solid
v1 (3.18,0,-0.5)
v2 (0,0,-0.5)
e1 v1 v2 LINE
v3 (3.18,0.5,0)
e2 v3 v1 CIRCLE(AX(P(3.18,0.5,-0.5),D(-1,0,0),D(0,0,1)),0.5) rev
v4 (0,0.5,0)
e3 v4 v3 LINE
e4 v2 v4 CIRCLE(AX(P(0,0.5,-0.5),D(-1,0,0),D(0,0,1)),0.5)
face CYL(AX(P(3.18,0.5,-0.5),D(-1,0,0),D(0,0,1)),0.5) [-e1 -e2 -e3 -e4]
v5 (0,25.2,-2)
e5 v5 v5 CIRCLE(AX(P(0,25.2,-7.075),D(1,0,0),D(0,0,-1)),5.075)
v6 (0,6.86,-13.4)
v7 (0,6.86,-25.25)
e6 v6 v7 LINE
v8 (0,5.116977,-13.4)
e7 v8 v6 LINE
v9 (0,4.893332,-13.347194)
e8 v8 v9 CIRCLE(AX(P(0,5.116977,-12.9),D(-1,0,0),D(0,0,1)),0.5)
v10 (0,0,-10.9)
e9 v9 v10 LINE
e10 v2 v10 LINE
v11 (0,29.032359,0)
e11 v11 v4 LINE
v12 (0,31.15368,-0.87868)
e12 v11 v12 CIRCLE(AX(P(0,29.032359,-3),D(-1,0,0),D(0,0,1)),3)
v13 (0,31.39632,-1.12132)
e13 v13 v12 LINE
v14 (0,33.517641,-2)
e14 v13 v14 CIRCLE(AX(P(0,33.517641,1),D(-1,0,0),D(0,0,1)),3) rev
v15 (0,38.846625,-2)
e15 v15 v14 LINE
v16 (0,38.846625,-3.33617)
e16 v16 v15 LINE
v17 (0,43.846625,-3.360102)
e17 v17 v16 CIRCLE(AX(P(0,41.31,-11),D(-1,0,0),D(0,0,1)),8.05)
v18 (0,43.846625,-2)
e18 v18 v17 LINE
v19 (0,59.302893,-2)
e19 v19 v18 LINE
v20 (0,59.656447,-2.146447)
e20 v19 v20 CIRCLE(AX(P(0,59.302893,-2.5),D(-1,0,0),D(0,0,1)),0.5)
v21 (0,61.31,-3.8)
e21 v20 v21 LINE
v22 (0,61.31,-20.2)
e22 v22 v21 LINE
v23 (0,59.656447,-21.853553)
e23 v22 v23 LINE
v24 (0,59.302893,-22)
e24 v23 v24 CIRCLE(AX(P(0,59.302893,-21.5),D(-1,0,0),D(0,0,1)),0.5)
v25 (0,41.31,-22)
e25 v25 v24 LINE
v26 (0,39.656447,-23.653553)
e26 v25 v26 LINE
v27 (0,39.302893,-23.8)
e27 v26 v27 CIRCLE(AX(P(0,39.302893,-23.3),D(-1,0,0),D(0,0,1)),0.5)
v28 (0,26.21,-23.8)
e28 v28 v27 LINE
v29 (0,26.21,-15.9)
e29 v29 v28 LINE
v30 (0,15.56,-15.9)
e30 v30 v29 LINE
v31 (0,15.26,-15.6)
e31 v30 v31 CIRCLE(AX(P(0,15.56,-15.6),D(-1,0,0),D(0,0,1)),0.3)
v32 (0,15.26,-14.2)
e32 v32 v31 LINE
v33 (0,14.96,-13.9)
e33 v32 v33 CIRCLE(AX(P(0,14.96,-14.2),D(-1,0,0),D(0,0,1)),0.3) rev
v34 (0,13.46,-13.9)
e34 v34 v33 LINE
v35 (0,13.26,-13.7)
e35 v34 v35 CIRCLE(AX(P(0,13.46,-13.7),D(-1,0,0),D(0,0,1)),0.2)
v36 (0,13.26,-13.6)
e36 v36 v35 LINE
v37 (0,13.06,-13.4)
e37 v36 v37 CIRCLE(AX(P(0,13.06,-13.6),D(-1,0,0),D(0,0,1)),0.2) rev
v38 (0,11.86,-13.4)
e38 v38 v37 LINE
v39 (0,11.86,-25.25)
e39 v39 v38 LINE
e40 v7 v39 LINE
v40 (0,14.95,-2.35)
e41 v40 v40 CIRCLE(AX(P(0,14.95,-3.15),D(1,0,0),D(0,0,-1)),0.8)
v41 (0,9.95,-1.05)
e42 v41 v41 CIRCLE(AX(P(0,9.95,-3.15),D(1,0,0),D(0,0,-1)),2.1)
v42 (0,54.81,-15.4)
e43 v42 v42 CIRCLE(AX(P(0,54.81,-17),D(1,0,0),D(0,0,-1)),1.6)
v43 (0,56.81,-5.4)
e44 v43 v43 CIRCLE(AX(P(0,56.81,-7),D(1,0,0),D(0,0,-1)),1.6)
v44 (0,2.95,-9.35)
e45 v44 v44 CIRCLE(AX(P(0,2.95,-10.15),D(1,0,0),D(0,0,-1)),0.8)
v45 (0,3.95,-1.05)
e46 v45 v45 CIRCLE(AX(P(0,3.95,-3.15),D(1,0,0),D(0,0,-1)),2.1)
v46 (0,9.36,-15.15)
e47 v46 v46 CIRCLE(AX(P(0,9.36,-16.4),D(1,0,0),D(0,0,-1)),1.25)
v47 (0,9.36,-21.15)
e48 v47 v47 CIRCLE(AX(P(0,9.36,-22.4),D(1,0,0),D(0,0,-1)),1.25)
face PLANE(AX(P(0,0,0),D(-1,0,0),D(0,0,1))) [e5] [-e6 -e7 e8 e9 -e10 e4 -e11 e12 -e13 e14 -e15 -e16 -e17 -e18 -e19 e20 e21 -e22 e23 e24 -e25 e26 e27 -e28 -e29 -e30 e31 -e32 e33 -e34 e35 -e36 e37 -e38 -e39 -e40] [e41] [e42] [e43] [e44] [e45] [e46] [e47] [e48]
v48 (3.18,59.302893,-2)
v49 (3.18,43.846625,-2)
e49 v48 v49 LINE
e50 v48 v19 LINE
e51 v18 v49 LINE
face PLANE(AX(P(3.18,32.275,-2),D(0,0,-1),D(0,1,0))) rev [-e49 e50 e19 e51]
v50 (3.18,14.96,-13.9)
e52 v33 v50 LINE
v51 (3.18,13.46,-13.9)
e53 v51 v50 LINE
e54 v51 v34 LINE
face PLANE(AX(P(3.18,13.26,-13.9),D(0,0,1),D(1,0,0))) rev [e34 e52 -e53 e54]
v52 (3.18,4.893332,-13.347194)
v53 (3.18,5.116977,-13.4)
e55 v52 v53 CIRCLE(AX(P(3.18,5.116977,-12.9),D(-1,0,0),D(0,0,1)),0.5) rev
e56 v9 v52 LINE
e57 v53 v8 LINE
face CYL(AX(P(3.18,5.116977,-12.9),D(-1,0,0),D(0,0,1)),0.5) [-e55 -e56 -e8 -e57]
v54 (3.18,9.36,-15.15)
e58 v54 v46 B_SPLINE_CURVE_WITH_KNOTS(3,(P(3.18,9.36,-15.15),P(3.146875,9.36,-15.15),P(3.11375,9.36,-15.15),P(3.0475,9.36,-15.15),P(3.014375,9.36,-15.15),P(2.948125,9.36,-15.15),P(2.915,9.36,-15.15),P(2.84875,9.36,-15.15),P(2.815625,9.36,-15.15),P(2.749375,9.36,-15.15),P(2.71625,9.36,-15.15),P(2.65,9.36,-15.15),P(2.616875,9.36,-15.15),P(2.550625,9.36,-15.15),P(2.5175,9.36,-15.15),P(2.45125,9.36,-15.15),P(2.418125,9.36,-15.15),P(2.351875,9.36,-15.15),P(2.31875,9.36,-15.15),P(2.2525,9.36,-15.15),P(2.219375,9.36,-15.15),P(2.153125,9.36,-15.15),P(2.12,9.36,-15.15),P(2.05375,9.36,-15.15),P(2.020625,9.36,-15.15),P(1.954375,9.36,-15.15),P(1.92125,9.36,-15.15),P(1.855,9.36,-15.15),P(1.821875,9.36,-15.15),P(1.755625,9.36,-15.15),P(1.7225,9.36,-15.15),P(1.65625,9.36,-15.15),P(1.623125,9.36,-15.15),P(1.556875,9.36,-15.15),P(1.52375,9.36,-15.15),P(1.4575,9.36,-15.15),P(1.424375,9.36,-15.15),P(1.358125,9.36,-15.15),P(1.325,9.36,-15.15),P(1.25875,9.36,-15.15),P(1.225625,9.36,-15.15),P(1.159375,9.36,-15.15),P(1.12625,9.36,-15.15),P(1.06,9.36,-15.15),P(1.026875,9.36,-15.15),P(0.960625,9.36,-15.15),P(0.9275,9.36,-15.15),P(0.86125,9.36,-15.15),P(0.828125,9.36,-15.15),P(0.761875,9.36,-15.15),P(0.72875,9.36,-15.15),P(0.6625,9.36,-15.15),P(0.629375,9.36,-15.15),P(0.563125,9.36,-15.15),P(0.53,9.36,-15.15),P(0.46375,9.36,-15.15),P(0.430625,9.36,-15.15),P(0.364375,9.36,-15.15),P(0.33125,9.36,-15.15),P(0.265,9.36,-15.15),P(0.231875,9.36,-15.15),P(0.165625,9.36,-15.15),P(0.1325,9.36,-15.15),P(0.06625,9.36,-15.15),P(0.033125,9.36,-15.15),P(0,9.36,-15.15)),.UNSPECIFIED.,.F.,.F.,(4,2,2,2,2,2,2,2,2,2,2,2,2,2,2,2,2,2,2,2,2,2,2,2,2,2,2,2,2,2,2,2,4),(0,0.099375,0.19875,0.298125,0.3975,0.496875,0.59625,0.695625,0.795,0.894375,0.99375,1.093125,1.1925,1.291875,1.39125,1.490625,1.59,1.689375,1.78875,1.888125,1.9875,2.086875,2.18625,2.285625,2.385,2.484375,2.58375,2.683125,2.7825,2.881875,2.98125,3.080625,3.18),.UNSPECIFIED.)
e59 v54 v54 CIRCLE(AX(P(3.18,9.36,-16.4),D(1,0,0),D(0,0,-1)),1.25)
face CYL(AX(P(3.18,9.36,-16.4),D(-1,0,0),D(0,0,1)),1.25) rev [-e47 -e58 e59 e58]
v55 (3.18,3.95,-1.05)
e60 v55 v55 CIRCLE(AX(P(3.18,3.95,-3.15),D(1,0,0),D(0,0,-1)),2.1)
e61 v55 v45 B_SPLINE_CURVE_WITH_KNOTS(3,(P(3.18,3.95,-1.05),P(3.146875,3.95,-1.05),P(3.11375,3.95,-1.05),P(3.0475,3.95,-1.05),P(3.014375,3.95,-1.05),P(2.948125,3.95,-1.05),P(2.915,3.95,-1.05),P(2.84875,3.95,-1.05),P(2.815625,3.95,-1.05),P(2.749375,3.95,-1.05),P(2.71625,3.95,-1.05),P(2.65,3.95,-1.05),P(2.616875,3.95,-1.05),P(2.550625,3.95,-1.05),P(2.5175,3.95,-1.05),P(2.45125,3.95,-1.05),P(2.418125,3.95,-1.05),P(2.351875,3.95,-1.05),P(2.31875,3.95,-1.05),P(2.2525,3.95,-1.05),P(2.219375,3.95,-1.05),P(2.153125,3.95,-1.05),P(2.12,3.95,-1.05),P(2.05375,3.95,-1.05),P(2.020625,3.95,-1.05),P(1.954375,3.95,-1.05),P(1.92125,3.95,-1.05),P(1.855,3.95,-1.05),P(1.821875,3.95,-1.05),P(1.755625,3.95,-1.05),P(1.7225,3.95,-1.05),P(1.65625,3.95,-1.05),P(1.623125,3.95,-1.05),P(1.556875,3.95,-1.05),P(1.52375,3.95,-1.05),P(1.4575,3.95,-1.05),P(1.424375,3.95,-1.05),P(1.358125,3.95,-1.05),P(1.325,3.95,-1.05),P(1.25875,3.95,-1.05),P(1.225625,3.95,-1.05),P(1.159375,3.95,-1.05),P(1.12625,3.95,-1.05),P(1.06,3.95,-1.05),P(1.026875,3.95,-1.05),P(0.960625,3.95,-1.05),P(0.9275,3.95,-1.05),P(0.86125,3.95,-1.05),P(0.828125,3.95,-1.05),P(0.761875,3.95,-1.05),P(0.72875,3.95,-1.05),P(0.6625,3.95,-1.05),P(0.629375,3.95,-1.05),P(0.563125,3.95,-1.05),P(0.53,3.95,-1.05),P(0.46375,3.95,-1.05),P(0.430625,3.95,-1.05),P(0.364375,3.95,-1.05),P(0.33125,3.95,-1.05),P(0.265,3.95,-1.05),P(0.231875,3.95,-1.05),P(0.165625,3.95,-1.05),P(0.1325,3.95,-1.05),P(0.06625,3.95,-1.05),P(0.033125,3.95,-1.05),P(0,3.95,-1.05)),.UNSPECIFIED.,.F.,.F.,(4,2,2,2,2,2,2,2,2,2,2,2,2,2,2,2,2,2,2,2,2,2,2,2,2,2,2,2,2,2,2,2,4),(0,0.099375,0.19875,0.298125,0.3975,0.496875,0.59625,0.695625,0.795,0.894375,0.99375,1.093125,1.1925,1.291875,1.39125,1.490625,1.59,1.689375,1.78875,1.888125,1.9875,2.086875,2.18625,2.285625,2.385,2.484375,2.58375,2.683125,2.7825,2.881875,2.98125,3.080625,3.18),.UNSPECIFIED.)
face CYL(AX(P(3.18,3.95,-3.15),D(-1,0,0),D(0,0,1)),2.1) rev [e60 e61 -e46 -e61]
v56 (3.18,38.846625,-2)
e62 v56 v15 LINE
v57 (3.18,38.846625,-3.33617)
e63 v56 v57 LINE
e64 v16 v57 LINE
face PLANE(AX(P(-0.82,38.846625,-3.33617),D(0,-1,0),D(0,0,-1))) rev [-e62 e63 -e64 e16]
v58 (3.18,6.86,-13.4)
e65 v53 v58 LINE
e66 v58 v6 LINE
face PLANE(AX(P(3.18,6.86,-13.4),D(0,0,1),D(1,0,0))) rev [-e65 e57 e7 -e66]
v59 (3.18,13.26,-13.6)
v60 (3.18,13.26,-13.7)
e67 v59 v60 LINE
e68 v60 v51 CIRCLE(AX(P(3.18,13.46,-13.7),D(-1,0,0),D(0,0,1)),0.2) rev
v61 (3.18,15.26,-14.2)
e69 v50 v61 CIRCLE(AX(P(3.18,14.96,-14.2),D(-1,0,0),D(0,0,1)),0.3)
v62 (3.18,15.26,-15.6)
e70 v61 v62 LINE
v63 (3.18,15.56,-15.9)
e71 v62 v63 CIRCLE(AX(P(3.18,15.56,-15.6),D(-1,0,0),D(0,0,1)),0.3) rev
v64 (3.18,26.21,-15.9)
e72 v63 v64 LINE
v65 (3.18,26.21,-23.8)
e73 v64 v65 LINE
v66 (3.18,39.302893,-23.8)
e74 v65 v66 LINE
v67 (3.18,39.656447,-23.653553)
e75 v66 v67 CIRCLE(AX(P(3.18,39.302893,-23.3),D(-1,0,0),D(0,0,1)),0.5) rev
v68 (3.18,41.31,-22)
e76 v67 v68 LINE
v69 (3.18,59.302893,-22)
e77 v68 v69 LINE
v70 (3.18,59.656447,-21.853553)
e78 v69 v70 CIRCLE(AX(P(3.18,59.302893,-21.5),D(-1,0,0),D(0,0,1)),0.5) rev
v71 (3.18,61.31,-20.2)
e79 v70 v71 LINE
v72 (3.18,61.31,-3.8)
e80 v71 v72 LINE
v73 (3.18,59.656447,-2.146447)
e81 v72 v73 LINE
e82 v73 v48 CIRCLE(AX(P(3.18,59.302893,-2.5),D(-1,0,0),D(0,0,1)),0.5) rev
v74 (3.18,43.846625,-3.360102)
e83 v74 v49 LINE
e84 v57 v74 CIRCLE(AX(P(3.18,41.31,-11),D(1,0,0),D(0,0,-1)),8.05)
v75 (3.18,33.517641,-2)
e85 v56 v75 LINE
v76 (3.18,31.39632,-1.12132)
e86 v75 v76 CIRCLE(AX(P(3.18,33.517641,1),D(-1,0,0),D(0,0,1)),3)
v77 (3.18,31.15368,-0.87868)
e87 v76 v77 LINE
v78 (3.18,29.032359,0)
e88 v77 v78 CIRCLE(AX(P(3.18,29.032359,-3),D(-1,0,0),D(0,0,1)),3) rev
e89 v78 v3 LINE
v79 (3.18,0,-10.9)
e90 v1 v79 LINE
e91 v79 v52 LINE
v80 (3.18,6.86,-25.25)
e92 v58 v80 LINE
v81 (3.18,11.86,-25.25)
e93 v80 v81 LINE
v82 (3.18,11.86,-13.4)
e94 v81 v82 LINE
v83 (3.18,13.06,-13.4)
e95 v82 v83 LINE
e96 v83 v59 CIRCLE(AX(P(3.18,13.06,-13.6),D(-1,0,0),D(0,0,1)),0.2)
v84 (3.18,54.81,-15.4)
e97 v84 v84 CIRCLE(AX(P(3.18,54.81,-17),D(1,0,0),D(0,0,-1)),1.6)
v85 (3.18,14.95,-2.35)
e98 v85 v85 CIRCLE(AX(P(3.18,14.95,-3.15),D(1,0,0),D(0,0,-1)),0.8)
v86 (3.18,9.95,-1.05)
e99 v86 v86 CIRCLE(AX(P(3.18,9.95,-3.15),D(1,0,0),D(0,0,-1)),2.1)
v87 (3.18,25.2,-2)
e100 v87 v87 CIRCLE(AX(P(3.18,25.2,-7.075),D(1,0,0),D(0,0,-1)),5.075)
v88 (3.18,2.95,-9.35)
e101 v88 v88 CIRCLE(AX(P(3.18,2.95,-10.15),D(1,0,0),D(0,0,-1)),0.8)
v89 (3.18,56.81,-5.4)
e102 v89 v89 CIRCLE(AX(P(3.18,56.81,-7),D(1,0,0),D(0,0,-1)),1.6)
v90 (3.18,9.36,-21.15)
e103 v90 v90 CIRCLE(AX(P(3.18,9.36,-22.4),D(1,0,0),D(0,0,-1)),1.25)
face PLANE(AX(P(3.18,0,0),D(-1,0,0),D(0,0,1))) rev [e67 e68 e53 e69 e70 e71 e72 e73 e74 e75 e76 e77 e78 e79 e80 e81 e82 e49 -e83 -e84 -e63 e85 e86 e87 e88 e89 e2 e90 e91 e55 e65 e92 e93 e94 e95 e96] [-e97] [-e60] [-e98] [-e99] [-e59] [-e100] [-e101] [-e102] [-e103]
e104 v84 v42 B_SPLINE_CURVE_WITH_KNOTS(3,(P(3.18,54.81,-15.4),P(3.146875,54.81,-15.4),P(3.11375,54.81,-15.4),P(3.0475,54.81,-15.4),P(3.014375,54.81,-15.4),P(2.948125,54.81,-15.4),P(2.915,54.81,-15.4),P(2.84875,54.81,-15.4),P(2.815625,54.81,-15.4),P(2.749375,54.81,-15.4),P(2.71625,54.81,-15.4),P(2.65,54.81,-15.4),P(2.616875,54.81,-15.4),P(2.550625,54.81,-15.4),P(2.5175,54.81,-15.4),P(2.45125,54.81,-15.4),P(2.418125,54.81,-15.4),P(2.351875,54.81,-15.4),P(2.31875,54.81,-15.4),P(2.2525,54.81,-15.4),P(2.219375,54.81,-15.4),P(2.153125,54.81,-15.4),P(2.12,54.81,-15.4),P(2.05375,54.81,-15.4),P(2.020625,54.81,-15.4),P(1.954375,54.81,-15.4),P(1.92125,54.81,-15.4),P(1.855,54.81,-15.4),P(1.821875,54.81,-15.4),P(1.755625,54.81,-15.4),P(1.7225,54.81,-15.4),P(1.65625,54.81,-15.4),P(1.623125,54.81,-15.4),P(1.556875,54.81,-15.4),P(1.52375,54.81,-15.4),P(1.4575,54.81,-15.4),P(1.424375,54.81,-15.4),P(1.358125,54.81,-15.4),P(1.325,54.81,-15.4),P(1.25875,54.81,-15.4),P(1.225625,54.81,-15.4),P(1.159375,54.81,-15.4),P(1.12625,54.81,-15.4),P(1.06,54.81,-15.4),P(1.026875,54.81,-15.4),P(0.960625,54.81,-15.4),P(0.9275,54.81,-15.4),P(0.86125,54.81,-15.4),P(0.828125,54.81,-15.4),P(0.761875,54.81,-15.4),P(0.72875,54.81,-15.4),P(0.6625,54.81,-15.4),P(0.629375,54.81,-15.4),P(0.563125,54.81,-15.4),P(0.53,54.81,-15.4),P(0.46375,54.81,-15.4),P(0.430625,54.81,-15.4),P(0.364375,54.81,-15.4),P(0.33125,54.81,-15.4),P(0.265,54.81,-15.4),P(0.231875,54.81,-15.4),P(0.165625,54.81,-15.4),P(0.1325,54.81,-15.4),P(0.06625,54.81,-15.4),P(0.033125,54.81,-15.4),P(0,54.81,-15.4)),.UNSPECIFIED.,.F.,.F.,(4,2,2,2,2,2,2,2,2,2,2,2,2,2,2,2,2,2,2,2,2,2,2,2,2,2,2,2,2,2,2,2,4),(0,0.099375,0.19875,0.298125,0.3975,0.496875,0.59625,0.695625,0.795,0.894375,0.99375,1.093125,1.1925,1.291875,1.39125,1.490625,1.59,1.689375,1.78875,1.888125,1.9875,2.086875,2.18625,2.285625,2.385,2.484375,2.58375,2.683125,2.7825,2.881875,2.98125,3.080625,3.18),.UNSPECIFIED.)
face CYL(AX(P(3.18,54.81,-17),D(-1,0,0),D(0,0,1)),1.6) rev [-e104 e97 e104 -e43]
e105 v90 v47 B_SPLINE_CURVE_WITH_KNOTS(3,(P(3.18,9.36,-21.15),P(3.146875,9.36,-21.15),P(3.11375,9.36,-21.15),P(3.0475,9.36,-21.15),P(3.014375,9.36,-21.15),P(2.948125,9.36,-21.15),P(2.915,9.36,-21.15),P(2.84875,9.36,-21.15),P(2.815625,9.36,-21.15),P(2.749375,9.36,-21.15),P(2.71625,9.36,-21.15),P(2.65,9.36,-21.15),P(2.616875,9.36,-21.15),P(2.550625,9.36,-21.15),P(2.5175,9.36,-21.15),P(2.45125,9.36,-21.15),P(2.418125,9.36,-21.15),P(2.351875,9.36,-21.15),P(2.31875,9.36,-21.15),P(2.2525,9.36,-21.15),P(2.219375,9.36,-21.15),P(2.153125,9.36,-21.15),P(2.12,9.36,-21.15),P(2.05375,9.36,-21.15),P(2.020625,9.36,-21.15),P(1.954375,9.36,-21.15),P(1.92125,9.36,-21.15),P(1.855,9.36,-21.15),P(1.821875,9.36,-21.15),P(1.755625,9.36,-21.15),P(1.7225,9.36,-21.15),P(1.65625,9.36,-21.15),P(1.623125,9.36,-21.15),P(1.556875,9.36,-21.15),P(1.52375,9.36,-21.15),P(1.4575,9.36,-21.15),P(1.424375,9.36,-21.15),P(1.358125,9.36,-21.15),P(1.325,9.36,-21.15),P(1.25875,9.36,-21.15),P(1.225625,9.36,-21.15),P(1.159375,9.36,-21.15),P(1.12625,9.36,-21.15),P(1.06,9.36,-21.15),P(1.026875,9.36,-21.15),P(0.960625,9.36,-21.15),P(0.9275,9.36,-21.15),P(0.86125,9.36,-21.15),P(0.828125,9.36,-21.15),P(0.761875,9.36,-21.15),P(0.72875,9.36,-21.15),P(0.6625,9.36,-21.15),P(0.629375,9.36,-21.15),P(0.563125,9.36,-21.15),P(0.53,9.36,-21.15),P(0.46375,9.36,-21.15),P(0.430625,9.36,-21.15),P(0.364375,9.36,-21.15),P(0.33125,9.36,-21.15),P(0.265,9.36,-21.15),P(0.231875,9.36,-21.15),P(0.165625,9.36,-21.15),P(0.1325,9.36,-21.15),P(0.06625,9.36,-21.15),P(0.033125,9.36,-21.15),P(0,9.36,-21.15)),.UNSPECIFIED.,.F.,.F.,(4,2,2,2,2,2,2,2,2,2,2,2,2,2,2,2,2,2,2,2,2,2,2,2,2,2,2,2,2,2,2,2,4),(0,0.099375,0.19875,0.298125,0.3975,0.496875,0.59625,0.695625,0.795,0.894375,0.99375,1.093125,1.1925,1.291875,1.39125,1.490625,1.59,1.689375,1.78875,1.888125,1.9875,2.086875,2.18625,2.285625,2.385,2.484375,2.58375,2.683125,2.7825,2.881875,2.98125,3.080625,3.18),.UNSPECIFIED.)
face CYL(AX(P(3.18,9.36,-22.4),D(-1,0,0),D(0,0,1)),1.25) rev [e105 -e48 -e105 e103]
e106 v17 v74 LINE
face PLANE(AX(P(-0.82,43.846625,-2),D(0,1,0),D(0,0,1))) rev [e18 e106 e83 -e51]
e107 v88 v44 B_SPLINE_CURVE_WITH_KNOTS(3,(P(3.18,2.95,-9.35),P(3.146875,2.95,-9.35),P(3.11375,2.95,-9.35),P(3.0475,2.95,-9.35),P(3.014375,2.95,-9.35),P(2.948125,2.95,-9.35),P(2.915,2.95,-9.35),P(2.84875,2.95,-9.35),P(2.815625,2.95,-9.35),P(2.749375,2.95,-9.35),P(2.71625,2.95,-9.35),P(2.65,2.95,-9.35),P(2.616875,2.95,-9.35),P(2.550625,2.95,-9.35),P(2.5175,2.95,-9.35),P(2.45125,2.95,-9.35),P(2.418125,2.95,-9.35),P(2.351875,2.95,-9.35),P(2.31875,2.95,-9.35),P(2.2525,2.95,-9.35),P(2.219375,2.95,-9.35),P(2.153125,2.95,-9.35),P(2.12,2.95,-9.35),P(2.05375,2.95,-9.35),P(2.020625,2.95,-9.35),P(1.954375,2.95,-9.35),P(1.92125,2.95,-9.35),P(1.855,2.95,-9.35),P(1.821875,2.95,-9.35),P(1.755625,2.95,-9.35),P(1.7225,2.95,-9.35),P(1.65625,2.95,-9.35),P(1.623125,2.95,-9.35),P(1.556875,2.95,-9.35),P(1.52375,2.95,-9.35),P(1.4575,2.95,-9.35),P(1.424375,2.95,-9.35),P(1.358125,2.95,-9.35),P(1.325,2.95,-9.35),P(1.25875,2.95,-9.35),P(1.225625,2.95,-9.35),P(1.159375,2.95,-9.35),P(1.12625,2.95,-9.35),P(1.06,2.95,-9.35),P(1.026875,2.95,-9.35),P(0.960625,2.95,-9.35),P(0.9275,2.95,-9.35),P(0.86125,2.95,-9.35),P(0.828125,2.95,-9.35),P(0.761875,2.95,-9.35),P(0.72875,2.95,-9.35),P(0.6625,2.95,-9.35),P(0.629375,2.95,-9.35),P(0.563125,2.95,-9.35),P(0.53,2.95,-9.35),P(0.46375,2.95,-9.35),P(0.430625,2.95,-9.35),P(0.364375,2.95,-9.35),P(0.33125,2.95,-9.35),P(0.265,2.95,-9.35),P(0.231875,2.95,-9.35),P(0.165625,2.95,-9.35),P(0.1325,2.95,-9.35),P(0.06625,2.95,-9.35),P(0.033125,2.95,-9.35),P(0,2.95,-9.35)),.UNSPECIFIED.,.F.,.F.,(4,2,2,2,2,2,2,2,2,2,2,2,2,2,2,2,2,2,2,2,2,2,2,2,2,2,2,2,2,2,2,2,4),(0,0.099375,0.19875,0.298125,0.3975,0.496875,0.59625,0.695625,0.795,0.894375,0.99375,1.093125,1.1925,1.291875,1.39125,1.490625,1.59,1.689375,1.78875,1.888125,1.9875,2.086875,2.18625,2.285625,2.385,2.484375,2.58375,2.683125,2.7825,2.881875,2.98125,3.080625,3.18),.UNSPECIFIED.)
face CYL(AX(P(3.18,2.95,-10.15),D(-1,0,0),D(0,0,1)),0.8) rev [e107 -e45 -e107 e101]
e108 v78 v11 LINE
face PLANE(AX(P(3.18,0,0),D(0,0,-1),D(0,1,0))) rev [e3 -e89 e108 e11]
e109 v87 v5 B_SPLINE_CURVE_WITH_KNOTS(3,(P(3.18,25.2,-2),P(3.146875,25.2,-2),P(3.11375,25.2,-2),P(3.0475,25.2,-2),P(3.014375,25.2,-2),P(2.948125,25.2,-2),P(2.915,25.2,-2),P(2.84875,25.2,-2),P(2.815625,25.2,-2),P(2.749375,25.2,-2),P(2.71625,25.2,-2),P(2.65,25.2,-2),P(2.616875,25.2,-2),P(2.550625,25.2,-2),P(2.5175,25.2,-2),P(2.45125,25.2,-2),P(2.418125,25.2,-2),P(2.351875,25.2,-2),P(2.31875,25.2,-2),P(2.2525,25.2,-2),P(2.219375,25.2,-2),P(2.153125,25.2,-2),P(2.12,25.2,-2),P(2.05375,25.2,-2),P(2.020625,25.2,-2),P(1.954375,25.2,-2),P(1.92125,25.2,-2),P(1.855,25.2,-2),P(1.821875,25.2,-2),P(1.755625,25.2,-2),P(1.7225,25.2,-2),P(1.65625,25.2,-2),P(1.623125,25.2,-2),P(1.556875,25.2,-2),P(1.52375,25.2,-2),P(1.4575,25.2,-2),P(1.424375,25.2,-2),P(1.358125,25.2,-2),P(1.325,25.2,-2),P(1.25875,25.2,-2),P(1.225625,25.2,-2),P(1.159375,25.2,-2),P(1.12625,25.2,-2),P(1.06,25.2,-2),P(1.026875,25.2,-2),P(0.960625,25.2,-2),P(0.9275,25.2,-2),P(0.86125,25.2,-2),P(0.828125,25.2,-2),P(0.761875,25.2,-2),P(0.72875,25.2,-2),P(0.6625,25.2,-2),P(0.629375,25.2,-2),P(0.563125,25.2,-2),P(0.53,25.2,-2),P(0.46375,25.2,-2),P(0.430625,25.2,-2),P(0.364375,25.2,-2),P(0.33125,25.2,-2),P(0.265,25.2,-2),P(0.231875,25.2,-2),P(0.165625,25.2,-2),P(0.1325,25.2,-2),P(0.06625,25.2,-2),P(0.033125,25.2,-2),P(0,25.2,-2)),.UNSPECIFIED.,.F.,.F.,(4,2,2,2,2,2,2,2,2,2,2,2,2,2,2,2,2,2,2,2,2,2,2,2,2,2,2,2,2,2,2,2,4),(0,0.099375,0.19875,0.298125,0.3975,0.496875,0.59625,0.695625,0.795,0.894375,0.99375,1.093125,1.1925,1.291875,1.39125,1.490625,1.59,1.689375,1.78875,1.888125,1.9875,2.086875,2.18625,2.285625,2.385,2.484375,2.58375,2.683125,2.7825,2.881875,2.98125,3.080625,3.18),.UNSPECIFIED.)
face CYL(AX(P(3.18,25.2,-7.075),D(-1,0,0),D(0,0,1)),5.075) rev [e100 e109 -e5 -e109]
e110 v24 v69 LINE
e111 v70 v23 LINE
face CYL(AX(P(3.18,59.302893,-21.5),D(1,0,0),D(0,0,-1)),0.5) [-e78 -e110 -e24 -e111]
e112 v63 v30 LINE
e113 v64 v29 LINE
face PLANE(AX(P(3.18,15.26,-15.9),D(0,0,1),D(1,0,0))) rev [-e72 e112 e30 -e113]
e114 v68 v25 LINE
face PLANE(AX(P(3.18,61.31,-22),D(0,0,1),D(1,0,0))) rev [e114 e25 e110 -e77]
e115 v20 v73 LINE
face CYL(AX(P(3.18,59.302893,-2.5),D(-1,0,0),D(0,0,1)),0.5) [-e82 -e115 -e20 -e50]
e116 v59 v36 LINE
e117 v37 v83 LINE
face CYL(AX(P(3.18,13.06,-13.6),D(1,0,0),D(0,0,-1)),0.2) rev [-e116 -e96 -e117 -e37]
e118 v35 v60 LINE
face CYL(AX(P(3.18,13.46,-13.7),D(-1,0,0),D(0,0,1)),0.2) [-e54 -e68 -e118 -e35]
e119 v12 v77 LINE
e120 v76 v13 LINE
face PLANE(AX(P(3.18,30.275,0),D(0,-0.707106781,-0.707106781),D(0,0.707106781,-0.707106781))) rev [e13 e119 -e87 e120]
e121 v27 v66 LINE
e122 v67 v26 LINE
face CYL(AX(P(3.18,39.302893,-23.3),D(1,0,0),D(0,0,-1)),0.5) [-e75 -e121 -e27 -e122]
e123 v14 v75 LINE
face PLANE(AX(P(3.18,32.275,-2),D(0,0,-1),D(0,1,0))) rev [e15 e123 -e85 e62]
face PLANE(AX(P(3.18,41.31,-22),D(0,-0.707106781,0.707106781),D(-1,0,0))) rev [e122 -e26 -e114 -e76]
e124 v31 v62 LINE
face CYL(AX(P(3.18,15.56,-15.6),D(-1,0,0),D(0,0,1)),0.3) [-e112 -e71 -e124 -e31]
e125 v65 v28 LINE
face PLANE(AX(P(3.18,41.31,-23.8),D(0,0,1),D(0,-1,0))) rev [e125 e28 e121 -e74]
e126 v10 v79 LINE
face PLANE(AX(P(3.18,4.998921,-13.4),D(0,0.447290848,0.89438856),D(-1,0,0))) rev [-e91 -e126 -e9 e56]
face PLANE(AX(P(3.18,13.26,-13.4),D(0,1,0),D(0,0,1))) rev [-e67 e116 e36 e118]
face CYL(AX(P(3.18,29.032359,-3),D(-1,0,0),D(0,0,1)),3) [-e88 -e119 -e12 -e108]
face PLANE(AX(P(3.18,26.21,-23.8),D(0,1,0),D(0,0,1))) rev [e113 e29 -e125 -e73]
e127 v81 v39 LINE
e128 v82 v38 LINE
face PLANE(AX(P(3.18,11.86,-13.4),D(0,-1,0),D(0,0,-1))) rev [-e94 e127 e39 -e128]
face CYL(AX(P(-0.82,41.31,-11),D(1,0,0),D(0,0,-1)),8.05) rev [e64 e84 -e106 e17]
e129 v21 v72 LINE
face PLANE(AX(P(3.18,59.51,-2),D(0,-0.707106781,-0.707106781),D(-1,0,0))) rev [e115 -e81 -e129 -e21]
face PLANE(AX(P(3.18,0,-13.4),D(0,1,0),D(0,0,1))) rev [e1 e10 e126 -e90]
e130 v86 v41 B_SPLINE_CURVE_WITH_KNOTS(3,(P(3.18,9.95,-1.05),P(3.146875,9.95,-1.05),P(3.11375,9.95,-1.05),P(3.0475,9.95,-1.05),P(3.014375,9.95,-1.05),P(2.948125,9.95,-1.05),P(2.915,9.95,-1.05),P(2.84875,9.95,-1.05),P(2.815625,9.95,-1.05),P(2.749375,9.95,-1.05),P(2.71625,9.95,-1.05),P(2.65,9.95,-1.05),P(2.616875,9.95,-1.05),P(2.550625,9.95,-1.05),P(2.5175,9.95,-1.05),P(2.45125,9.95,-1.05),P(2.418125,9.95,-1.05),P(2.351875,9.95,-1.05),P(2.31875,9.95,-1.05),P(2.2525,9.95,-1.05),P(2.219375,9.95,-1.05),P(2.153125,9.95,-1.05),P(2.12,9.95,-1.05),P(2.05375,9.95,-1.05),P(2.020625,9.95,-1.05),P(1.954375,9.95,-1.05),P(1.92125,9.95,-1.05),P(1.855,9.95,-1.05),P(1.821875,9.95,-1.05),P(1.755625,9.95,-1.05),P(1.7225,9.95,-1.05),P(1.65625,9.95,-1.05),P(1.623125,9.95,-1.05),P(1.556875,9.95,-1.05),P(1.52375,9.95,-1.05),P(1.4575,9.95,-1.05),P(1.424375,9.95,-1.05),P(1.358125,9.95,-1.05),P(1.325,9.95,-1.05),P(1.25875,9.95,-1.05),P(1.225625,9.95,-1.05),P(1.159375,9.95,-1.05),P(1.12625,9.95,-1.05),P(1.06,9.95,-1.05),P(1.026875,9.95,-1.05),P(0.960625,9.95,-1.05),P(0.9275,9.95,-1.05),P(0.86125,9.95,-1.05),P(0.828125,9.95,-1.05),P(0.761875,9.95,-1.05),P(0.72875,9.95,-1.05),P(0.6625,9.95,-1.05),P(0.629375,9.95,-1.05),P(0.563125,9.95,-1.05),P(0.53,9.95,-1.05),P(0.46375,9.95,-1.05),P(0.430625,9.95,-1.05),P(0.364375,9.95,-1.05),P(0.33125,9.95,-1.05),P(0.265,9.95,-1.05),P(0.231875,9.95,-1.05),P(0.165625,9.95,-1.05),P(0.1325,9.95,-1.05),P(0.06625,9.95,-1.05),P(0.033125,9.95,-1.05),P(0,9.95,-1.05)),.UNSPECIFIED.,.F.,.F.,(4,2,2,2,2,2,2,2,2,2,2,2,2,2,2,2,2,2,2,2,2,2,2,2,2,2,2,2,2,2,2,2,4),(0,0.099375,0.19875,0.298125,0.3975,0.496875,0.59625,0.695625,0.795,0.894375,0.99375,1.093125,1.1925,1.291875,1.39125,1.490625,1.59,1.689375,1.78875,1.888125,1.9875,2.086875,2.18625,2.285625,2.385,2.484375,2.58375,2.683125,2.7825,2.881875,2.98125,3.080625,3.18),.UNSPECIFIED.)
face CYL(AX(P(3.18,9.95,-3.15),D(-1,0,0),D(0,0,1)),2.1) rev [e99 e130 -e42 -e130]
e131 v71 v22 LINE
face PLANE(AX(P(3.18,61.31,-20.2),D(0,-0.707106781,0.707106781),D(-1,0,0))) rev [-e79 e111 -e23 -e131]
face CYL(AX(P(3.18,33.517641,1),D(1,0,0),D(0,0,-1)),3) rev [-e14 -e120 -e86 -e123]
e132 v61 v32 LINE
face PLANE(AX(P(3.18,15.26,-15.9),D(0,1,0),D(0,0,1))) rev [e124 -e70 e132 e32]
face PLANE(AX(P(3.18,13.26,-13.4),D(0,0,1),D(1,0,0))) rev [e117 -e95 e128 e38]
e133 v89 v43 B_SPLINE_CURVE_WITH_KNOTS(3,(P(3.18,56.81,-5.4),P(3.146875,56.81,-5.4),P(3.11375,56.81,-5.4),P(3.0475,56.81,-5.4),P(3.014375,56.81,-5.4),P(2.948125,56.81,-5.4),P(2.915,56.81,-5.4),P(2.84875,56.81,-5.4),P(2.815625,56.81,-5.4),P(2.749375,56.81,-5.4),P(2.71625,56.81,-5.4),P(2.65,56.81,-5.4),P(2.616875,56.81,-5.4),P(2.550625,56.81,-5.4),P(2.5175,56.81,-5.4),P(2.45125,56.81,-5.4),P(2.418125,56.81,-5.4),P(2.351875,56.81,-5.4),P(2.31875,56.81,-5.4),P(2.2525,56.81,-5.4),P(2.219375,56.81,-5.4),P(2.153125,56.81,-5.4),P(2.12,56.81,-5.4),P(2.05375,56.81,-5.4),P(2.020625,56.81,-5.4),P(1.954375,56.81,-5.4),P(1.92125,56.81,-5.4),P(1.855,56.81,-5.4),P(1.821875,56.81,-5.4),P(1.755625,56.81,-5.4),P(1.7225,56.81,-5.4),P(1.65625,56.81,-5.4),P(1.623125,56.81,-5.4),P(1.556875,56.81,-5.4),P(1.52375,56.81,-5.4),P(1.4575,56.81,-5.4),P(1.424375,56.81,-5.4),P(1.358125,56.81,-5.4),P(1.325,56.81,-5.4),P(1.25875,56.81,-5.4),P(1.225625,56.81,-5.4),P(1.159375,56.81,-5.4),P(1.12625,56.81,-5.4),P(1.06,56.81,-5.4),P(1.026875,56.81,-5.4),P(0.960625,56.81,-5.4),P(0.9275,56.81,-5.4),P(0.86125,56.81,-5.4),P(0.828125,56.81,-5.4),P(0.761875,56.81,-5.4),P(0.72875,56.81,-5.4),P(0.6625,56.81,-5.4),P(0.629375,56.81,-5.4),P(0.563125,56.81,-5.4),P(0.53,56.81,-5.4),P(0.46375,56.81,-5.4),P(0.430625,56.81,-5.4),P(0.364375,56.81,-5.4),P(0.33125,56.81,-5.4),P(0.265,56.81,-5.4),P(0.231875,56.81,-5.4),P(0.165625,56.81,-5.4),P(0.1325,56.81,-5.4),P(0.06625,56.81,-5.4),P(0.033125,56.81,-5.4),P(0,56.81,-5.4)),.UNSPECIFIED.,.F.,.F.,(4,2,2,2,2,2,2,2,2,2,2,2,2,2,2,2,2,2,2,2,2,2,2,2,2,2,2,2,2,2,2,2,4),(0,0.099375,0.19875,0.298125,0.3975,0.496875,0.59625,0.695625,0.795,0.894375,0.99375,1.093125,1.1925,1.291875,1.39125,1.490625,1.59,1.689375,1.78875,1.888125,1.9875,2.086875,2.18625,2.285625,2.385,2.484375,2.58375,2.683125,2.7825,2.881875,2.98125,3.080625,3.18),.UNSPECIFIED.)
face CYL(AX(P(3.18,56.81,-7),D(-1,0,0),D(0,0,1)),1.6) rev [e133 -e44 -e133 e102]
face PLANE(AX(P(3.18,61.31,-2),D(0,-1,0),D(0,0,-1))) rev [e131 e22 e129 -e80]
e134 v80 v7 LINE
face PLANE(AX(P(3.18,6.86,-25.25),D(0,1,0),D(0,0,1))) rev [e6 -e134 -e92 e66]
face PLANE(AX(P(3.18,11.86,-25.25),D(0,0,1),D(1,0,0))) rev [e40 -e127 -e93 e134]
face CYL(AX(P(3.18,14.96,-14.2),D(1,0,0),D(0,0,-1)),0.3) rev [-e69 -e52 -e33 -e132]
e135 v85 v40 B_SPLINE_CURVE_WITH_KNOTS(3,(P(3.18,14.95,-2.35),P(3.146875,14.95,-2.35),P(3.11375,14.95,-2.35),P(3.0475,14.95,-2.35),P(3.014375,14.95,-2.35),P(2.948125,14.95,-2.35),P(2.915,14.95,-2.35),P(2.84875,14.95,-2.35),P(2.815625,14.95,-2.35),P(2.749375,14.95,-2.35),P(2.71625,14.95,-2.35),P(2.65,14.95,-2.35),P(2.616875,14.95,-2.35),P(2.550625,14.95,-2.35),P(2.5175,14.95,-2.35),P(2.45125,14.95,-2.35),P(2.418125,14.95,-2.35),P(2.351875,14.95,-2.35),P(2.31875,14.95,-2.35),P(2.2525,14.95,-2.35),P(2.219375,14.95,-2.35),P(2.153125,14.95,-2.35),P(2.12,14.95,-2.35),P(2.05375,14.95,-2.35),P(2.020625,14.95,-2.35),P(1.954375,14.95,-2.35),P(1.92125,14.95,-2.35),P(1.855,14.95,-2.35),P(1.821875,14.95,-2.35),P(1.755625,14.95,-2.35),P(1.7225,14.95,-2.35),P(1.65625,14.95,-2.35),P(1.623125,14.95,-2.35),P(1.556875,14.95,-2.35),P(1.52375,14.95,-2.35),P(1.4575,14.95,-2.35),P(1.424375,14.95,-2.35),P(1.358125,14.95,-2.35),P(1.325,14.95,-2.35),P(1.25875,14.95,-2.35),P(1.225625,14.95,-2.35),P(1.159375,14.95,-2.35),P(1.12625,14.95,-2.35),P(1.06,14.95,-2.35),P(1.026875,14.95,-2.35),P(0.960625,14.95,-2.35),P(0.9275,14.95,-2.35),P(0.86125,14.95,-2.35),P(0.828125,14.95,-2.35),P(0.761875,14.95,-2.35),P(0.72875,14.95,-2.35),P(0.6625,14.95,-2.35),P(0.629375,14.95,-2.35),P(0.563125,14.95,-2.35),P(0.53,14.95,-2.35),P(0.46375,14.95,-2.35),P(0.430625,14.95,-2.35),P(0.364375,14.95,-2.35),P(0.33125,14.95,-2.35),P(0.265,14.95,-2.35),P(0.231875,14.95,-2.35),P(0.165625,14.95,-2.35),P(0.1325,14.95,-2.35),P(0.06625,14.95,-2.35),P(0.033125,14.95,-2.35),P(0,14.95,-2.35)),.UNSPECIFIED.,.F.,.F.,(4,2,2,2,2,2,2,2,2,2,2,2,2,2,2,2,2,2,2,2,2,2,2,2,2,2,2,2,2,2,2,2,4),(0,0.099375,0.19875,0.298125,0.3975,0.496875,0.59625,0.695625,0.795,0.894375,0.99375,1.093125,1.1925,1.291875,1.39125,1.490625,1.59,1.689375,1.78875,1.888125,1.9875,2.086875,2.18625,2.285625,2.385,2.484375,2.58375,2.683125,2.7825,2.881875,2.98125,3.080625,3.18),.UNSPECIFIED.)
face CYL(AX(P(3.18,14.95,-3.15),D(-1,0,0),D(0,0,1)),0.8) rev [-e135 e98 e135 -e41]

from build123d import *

# Parameters (mm, degrees)
SKETCH1_R             = 5.075
SKETCH1_R_2           = 1.6
SKETCH1_R_3           = 1.25
SKETCH1_R_4           = 2.1
SKETCH1_R_5           = 0.8
BOSS_EXTRUDE1_DEPTH   = 3.18
CHAMFER1_SIZE         = 2.5
CHAMFER1_SIZE2        = 4.998920521
FILLET2_R             = 3
CHAMFER2_SIZE         = 1.8
FILLET4_R             = 0.5
FILLET7_R             = 0.2
M3X0_5_TAPPED_HOLE1_D = 2.5
M2_TAPPED_HOLE1_D     = 1.6
FILLET8_R             = 0.3
CUT_EXTRUDE5_DEPTH    = 4


with BuildPart() as part:
    # Sketch1 → Boss-Extrude1 (new body)
    with BuildSketch(Plane(origin=(0, 0, 0), x_dir=(0, 0, -1), z_dir=(1, 0, 0))):
        Polygon((0, 0), (0, 30.275), (2, 32.275), (2, 61.31), (22, 61.31), (22, 41.31), (23.8, 41.31), (23.8, 26.21), (15.9, 26.21), (15.9, 15.26), (13.9, 15.26), (13.9, 13.26), (13.4, 13.26), (13.4, 11.86), (25.25, 11.86), (25.25, 6.86), (13.4, 6.86), (13.4, 0), align=None)
        with Locations(Location((7.075, 25.2, 0), (0, 0, 180))):
            Circle(SKETCH1_R, mode=Mode.SUBTRACT)
        with Locations(Location((7, 56.81, 0), (0, 0, 180))):
            Circle(SKETCH1_R_2, mode=Mode.SUBTRACT)
        with Locations(Location((17, 54.81, 0), (0, 0, 180))):
            Circle(SKETCH1_R_2, mode=Mode.SUBTRACT)
        with Locations(Location((22.4, 9.36, 0), (0, 0, 180))):
            Circle(SKETCH1_R_3, mode=Mode.SUBTRACT)
        with Locations(Location((16.4, 9.36, 0), (0, 0, 180))):
            Circle(SKETCH1_R_3, mode=Mode.SUBTRACT)
        with Locations(Location((3.15, 3.95, 0), (0, 0, 180))):
            Circle(SKETCH1_R_4, mode=Mode.SUBTRACT)
        with Locations(Location((3.15, 9.95, 0), (0, 0, 180))):
            Circle(SKETCH1_R_4, mode=Mode.SUBTRACT)
        with Locations(Location((10.15, 2.95, 0), (0, 0, 180))):
            Circle(SKETCH1_R_5, mode=Mode.SUBTRACT)
        with Locations(Location((3.15, 14.95, 0), (0, 0, 180))):
            Circle(SKETCH1_R_5, mode=Mode.SUBTRACT)
    extrude(amount=BOSS_EXTRUDE1_DEPTH)

    # Chamfer1
    chamfer1_edges = [part.edges().sort_by_distance(p)[0] for p in [
        (1.59, 0, -13.4),
    ]]
    chamfer1_side = [part.faces().sort_by_distance(p)[0] for p in [
        (1.59, 0, -6.7),
    ]]
    chamfer(chamfer1_edges, length=CHAMFER1_SIZE, length2=CHAMFER1_SIZE2, reference=chamfer1_side[0])

    # Fillet2
    fillet2_edges = [part.edges().sort_by_distance(p)[0] for p in [
        (1.59, 30.275, 0),
        (1.59, 32.275, -2),
    ]]
    fillet(fillet2_edges, radius=FILLET2_R)

    # Chamfer2
    chamfer2_edges = [part.edges().sort_by_distance(p)[0] for p in [
        (1.59, 61.31, -22),
        (1.59, 61.31, -2),
        (1.59, 41.31, -23.8),
    ]]
    chamfer(chamfer2_edges, length=CHAMFER2_SIZE - 0.0001)  # a hair under: the kernel refuses the full size

    # Fillet4
    fillet4_edges = [part.edges().sort_by_distance(p)[0] for p in [
        (1.59, 39.5101, -23.8),
        (1.59, 59.5101, -22),
        (1.59, 59.5101, -2),
        (1.59, 0, 0),
        (1.59, 4.998920521, -13.4),
    ]]
    fillet(fillet4_edges, radius=FILLET4_R)

    # Fillet7
    fillet7_edges = [part.edges().sort_by_distance(p)[0] for p in [
        (1.59, 13.26, -13.9),
        (1.59, 13.26, -13.4),
    ]]
    fillet(fillet7_edges, radius=FILLET7_R)

    # M3x0.5 Tapped Hole1 (through all)
    with Locations(Plane(origin=(3.18, 0, 0), x_dir=(0, 0, -1), z_dir=(1, 0, 0))):
        with Locations((16.4, 9.36), (22.4, 9.36)):
            Hole(M3X0_5_TAPPED_HOLE1_D / 2)

    # M2 Tapped Hole1 (through all)
    with Locations(Plane(origin=(0, 14.95, -3.15), x_dir=(0, 0, -1), z_dir=(-1, 0, 0))):
        with Locations((0, 0), (7, 12)):
            Hole(M2_TAPPED_HOLE1_D / 2)

    # Fillet8
    fillet8_edges = [part.edges().sort_by_distance(p)[0] for p in [
        (1.59, 15.26, -15.9),
        (1.59, 15.26, -13.9),
    ]]
    fillet(fillet8_edges, radius=FILLET8_R)

    # Sketch13 → Cut-Extrude5 (cut)
    with BuildSketch(Plane(origin=(3.18, 0, 0), x_dir=(0, 0, -1), z_dir=(1, 0, 0))):
        with BuildLine():
            Line((2, 43.846624835), (2, 38.846624835))
            Line((2, 38.846624835), (3.336170487, 38.846624835))
            ThreePointArc((3.336170487, 38.846624835), (19.049907791, 41.271469968), (3.360102459, 43.846624835))
            Line((3.360102459, 43.846624835), (2, 43.846624835))
        make_face()
    extrude(amount=-CUT_EXTRUDE5_DEPTH, mode=Mode.SUBTRACT)


solid = part.part
